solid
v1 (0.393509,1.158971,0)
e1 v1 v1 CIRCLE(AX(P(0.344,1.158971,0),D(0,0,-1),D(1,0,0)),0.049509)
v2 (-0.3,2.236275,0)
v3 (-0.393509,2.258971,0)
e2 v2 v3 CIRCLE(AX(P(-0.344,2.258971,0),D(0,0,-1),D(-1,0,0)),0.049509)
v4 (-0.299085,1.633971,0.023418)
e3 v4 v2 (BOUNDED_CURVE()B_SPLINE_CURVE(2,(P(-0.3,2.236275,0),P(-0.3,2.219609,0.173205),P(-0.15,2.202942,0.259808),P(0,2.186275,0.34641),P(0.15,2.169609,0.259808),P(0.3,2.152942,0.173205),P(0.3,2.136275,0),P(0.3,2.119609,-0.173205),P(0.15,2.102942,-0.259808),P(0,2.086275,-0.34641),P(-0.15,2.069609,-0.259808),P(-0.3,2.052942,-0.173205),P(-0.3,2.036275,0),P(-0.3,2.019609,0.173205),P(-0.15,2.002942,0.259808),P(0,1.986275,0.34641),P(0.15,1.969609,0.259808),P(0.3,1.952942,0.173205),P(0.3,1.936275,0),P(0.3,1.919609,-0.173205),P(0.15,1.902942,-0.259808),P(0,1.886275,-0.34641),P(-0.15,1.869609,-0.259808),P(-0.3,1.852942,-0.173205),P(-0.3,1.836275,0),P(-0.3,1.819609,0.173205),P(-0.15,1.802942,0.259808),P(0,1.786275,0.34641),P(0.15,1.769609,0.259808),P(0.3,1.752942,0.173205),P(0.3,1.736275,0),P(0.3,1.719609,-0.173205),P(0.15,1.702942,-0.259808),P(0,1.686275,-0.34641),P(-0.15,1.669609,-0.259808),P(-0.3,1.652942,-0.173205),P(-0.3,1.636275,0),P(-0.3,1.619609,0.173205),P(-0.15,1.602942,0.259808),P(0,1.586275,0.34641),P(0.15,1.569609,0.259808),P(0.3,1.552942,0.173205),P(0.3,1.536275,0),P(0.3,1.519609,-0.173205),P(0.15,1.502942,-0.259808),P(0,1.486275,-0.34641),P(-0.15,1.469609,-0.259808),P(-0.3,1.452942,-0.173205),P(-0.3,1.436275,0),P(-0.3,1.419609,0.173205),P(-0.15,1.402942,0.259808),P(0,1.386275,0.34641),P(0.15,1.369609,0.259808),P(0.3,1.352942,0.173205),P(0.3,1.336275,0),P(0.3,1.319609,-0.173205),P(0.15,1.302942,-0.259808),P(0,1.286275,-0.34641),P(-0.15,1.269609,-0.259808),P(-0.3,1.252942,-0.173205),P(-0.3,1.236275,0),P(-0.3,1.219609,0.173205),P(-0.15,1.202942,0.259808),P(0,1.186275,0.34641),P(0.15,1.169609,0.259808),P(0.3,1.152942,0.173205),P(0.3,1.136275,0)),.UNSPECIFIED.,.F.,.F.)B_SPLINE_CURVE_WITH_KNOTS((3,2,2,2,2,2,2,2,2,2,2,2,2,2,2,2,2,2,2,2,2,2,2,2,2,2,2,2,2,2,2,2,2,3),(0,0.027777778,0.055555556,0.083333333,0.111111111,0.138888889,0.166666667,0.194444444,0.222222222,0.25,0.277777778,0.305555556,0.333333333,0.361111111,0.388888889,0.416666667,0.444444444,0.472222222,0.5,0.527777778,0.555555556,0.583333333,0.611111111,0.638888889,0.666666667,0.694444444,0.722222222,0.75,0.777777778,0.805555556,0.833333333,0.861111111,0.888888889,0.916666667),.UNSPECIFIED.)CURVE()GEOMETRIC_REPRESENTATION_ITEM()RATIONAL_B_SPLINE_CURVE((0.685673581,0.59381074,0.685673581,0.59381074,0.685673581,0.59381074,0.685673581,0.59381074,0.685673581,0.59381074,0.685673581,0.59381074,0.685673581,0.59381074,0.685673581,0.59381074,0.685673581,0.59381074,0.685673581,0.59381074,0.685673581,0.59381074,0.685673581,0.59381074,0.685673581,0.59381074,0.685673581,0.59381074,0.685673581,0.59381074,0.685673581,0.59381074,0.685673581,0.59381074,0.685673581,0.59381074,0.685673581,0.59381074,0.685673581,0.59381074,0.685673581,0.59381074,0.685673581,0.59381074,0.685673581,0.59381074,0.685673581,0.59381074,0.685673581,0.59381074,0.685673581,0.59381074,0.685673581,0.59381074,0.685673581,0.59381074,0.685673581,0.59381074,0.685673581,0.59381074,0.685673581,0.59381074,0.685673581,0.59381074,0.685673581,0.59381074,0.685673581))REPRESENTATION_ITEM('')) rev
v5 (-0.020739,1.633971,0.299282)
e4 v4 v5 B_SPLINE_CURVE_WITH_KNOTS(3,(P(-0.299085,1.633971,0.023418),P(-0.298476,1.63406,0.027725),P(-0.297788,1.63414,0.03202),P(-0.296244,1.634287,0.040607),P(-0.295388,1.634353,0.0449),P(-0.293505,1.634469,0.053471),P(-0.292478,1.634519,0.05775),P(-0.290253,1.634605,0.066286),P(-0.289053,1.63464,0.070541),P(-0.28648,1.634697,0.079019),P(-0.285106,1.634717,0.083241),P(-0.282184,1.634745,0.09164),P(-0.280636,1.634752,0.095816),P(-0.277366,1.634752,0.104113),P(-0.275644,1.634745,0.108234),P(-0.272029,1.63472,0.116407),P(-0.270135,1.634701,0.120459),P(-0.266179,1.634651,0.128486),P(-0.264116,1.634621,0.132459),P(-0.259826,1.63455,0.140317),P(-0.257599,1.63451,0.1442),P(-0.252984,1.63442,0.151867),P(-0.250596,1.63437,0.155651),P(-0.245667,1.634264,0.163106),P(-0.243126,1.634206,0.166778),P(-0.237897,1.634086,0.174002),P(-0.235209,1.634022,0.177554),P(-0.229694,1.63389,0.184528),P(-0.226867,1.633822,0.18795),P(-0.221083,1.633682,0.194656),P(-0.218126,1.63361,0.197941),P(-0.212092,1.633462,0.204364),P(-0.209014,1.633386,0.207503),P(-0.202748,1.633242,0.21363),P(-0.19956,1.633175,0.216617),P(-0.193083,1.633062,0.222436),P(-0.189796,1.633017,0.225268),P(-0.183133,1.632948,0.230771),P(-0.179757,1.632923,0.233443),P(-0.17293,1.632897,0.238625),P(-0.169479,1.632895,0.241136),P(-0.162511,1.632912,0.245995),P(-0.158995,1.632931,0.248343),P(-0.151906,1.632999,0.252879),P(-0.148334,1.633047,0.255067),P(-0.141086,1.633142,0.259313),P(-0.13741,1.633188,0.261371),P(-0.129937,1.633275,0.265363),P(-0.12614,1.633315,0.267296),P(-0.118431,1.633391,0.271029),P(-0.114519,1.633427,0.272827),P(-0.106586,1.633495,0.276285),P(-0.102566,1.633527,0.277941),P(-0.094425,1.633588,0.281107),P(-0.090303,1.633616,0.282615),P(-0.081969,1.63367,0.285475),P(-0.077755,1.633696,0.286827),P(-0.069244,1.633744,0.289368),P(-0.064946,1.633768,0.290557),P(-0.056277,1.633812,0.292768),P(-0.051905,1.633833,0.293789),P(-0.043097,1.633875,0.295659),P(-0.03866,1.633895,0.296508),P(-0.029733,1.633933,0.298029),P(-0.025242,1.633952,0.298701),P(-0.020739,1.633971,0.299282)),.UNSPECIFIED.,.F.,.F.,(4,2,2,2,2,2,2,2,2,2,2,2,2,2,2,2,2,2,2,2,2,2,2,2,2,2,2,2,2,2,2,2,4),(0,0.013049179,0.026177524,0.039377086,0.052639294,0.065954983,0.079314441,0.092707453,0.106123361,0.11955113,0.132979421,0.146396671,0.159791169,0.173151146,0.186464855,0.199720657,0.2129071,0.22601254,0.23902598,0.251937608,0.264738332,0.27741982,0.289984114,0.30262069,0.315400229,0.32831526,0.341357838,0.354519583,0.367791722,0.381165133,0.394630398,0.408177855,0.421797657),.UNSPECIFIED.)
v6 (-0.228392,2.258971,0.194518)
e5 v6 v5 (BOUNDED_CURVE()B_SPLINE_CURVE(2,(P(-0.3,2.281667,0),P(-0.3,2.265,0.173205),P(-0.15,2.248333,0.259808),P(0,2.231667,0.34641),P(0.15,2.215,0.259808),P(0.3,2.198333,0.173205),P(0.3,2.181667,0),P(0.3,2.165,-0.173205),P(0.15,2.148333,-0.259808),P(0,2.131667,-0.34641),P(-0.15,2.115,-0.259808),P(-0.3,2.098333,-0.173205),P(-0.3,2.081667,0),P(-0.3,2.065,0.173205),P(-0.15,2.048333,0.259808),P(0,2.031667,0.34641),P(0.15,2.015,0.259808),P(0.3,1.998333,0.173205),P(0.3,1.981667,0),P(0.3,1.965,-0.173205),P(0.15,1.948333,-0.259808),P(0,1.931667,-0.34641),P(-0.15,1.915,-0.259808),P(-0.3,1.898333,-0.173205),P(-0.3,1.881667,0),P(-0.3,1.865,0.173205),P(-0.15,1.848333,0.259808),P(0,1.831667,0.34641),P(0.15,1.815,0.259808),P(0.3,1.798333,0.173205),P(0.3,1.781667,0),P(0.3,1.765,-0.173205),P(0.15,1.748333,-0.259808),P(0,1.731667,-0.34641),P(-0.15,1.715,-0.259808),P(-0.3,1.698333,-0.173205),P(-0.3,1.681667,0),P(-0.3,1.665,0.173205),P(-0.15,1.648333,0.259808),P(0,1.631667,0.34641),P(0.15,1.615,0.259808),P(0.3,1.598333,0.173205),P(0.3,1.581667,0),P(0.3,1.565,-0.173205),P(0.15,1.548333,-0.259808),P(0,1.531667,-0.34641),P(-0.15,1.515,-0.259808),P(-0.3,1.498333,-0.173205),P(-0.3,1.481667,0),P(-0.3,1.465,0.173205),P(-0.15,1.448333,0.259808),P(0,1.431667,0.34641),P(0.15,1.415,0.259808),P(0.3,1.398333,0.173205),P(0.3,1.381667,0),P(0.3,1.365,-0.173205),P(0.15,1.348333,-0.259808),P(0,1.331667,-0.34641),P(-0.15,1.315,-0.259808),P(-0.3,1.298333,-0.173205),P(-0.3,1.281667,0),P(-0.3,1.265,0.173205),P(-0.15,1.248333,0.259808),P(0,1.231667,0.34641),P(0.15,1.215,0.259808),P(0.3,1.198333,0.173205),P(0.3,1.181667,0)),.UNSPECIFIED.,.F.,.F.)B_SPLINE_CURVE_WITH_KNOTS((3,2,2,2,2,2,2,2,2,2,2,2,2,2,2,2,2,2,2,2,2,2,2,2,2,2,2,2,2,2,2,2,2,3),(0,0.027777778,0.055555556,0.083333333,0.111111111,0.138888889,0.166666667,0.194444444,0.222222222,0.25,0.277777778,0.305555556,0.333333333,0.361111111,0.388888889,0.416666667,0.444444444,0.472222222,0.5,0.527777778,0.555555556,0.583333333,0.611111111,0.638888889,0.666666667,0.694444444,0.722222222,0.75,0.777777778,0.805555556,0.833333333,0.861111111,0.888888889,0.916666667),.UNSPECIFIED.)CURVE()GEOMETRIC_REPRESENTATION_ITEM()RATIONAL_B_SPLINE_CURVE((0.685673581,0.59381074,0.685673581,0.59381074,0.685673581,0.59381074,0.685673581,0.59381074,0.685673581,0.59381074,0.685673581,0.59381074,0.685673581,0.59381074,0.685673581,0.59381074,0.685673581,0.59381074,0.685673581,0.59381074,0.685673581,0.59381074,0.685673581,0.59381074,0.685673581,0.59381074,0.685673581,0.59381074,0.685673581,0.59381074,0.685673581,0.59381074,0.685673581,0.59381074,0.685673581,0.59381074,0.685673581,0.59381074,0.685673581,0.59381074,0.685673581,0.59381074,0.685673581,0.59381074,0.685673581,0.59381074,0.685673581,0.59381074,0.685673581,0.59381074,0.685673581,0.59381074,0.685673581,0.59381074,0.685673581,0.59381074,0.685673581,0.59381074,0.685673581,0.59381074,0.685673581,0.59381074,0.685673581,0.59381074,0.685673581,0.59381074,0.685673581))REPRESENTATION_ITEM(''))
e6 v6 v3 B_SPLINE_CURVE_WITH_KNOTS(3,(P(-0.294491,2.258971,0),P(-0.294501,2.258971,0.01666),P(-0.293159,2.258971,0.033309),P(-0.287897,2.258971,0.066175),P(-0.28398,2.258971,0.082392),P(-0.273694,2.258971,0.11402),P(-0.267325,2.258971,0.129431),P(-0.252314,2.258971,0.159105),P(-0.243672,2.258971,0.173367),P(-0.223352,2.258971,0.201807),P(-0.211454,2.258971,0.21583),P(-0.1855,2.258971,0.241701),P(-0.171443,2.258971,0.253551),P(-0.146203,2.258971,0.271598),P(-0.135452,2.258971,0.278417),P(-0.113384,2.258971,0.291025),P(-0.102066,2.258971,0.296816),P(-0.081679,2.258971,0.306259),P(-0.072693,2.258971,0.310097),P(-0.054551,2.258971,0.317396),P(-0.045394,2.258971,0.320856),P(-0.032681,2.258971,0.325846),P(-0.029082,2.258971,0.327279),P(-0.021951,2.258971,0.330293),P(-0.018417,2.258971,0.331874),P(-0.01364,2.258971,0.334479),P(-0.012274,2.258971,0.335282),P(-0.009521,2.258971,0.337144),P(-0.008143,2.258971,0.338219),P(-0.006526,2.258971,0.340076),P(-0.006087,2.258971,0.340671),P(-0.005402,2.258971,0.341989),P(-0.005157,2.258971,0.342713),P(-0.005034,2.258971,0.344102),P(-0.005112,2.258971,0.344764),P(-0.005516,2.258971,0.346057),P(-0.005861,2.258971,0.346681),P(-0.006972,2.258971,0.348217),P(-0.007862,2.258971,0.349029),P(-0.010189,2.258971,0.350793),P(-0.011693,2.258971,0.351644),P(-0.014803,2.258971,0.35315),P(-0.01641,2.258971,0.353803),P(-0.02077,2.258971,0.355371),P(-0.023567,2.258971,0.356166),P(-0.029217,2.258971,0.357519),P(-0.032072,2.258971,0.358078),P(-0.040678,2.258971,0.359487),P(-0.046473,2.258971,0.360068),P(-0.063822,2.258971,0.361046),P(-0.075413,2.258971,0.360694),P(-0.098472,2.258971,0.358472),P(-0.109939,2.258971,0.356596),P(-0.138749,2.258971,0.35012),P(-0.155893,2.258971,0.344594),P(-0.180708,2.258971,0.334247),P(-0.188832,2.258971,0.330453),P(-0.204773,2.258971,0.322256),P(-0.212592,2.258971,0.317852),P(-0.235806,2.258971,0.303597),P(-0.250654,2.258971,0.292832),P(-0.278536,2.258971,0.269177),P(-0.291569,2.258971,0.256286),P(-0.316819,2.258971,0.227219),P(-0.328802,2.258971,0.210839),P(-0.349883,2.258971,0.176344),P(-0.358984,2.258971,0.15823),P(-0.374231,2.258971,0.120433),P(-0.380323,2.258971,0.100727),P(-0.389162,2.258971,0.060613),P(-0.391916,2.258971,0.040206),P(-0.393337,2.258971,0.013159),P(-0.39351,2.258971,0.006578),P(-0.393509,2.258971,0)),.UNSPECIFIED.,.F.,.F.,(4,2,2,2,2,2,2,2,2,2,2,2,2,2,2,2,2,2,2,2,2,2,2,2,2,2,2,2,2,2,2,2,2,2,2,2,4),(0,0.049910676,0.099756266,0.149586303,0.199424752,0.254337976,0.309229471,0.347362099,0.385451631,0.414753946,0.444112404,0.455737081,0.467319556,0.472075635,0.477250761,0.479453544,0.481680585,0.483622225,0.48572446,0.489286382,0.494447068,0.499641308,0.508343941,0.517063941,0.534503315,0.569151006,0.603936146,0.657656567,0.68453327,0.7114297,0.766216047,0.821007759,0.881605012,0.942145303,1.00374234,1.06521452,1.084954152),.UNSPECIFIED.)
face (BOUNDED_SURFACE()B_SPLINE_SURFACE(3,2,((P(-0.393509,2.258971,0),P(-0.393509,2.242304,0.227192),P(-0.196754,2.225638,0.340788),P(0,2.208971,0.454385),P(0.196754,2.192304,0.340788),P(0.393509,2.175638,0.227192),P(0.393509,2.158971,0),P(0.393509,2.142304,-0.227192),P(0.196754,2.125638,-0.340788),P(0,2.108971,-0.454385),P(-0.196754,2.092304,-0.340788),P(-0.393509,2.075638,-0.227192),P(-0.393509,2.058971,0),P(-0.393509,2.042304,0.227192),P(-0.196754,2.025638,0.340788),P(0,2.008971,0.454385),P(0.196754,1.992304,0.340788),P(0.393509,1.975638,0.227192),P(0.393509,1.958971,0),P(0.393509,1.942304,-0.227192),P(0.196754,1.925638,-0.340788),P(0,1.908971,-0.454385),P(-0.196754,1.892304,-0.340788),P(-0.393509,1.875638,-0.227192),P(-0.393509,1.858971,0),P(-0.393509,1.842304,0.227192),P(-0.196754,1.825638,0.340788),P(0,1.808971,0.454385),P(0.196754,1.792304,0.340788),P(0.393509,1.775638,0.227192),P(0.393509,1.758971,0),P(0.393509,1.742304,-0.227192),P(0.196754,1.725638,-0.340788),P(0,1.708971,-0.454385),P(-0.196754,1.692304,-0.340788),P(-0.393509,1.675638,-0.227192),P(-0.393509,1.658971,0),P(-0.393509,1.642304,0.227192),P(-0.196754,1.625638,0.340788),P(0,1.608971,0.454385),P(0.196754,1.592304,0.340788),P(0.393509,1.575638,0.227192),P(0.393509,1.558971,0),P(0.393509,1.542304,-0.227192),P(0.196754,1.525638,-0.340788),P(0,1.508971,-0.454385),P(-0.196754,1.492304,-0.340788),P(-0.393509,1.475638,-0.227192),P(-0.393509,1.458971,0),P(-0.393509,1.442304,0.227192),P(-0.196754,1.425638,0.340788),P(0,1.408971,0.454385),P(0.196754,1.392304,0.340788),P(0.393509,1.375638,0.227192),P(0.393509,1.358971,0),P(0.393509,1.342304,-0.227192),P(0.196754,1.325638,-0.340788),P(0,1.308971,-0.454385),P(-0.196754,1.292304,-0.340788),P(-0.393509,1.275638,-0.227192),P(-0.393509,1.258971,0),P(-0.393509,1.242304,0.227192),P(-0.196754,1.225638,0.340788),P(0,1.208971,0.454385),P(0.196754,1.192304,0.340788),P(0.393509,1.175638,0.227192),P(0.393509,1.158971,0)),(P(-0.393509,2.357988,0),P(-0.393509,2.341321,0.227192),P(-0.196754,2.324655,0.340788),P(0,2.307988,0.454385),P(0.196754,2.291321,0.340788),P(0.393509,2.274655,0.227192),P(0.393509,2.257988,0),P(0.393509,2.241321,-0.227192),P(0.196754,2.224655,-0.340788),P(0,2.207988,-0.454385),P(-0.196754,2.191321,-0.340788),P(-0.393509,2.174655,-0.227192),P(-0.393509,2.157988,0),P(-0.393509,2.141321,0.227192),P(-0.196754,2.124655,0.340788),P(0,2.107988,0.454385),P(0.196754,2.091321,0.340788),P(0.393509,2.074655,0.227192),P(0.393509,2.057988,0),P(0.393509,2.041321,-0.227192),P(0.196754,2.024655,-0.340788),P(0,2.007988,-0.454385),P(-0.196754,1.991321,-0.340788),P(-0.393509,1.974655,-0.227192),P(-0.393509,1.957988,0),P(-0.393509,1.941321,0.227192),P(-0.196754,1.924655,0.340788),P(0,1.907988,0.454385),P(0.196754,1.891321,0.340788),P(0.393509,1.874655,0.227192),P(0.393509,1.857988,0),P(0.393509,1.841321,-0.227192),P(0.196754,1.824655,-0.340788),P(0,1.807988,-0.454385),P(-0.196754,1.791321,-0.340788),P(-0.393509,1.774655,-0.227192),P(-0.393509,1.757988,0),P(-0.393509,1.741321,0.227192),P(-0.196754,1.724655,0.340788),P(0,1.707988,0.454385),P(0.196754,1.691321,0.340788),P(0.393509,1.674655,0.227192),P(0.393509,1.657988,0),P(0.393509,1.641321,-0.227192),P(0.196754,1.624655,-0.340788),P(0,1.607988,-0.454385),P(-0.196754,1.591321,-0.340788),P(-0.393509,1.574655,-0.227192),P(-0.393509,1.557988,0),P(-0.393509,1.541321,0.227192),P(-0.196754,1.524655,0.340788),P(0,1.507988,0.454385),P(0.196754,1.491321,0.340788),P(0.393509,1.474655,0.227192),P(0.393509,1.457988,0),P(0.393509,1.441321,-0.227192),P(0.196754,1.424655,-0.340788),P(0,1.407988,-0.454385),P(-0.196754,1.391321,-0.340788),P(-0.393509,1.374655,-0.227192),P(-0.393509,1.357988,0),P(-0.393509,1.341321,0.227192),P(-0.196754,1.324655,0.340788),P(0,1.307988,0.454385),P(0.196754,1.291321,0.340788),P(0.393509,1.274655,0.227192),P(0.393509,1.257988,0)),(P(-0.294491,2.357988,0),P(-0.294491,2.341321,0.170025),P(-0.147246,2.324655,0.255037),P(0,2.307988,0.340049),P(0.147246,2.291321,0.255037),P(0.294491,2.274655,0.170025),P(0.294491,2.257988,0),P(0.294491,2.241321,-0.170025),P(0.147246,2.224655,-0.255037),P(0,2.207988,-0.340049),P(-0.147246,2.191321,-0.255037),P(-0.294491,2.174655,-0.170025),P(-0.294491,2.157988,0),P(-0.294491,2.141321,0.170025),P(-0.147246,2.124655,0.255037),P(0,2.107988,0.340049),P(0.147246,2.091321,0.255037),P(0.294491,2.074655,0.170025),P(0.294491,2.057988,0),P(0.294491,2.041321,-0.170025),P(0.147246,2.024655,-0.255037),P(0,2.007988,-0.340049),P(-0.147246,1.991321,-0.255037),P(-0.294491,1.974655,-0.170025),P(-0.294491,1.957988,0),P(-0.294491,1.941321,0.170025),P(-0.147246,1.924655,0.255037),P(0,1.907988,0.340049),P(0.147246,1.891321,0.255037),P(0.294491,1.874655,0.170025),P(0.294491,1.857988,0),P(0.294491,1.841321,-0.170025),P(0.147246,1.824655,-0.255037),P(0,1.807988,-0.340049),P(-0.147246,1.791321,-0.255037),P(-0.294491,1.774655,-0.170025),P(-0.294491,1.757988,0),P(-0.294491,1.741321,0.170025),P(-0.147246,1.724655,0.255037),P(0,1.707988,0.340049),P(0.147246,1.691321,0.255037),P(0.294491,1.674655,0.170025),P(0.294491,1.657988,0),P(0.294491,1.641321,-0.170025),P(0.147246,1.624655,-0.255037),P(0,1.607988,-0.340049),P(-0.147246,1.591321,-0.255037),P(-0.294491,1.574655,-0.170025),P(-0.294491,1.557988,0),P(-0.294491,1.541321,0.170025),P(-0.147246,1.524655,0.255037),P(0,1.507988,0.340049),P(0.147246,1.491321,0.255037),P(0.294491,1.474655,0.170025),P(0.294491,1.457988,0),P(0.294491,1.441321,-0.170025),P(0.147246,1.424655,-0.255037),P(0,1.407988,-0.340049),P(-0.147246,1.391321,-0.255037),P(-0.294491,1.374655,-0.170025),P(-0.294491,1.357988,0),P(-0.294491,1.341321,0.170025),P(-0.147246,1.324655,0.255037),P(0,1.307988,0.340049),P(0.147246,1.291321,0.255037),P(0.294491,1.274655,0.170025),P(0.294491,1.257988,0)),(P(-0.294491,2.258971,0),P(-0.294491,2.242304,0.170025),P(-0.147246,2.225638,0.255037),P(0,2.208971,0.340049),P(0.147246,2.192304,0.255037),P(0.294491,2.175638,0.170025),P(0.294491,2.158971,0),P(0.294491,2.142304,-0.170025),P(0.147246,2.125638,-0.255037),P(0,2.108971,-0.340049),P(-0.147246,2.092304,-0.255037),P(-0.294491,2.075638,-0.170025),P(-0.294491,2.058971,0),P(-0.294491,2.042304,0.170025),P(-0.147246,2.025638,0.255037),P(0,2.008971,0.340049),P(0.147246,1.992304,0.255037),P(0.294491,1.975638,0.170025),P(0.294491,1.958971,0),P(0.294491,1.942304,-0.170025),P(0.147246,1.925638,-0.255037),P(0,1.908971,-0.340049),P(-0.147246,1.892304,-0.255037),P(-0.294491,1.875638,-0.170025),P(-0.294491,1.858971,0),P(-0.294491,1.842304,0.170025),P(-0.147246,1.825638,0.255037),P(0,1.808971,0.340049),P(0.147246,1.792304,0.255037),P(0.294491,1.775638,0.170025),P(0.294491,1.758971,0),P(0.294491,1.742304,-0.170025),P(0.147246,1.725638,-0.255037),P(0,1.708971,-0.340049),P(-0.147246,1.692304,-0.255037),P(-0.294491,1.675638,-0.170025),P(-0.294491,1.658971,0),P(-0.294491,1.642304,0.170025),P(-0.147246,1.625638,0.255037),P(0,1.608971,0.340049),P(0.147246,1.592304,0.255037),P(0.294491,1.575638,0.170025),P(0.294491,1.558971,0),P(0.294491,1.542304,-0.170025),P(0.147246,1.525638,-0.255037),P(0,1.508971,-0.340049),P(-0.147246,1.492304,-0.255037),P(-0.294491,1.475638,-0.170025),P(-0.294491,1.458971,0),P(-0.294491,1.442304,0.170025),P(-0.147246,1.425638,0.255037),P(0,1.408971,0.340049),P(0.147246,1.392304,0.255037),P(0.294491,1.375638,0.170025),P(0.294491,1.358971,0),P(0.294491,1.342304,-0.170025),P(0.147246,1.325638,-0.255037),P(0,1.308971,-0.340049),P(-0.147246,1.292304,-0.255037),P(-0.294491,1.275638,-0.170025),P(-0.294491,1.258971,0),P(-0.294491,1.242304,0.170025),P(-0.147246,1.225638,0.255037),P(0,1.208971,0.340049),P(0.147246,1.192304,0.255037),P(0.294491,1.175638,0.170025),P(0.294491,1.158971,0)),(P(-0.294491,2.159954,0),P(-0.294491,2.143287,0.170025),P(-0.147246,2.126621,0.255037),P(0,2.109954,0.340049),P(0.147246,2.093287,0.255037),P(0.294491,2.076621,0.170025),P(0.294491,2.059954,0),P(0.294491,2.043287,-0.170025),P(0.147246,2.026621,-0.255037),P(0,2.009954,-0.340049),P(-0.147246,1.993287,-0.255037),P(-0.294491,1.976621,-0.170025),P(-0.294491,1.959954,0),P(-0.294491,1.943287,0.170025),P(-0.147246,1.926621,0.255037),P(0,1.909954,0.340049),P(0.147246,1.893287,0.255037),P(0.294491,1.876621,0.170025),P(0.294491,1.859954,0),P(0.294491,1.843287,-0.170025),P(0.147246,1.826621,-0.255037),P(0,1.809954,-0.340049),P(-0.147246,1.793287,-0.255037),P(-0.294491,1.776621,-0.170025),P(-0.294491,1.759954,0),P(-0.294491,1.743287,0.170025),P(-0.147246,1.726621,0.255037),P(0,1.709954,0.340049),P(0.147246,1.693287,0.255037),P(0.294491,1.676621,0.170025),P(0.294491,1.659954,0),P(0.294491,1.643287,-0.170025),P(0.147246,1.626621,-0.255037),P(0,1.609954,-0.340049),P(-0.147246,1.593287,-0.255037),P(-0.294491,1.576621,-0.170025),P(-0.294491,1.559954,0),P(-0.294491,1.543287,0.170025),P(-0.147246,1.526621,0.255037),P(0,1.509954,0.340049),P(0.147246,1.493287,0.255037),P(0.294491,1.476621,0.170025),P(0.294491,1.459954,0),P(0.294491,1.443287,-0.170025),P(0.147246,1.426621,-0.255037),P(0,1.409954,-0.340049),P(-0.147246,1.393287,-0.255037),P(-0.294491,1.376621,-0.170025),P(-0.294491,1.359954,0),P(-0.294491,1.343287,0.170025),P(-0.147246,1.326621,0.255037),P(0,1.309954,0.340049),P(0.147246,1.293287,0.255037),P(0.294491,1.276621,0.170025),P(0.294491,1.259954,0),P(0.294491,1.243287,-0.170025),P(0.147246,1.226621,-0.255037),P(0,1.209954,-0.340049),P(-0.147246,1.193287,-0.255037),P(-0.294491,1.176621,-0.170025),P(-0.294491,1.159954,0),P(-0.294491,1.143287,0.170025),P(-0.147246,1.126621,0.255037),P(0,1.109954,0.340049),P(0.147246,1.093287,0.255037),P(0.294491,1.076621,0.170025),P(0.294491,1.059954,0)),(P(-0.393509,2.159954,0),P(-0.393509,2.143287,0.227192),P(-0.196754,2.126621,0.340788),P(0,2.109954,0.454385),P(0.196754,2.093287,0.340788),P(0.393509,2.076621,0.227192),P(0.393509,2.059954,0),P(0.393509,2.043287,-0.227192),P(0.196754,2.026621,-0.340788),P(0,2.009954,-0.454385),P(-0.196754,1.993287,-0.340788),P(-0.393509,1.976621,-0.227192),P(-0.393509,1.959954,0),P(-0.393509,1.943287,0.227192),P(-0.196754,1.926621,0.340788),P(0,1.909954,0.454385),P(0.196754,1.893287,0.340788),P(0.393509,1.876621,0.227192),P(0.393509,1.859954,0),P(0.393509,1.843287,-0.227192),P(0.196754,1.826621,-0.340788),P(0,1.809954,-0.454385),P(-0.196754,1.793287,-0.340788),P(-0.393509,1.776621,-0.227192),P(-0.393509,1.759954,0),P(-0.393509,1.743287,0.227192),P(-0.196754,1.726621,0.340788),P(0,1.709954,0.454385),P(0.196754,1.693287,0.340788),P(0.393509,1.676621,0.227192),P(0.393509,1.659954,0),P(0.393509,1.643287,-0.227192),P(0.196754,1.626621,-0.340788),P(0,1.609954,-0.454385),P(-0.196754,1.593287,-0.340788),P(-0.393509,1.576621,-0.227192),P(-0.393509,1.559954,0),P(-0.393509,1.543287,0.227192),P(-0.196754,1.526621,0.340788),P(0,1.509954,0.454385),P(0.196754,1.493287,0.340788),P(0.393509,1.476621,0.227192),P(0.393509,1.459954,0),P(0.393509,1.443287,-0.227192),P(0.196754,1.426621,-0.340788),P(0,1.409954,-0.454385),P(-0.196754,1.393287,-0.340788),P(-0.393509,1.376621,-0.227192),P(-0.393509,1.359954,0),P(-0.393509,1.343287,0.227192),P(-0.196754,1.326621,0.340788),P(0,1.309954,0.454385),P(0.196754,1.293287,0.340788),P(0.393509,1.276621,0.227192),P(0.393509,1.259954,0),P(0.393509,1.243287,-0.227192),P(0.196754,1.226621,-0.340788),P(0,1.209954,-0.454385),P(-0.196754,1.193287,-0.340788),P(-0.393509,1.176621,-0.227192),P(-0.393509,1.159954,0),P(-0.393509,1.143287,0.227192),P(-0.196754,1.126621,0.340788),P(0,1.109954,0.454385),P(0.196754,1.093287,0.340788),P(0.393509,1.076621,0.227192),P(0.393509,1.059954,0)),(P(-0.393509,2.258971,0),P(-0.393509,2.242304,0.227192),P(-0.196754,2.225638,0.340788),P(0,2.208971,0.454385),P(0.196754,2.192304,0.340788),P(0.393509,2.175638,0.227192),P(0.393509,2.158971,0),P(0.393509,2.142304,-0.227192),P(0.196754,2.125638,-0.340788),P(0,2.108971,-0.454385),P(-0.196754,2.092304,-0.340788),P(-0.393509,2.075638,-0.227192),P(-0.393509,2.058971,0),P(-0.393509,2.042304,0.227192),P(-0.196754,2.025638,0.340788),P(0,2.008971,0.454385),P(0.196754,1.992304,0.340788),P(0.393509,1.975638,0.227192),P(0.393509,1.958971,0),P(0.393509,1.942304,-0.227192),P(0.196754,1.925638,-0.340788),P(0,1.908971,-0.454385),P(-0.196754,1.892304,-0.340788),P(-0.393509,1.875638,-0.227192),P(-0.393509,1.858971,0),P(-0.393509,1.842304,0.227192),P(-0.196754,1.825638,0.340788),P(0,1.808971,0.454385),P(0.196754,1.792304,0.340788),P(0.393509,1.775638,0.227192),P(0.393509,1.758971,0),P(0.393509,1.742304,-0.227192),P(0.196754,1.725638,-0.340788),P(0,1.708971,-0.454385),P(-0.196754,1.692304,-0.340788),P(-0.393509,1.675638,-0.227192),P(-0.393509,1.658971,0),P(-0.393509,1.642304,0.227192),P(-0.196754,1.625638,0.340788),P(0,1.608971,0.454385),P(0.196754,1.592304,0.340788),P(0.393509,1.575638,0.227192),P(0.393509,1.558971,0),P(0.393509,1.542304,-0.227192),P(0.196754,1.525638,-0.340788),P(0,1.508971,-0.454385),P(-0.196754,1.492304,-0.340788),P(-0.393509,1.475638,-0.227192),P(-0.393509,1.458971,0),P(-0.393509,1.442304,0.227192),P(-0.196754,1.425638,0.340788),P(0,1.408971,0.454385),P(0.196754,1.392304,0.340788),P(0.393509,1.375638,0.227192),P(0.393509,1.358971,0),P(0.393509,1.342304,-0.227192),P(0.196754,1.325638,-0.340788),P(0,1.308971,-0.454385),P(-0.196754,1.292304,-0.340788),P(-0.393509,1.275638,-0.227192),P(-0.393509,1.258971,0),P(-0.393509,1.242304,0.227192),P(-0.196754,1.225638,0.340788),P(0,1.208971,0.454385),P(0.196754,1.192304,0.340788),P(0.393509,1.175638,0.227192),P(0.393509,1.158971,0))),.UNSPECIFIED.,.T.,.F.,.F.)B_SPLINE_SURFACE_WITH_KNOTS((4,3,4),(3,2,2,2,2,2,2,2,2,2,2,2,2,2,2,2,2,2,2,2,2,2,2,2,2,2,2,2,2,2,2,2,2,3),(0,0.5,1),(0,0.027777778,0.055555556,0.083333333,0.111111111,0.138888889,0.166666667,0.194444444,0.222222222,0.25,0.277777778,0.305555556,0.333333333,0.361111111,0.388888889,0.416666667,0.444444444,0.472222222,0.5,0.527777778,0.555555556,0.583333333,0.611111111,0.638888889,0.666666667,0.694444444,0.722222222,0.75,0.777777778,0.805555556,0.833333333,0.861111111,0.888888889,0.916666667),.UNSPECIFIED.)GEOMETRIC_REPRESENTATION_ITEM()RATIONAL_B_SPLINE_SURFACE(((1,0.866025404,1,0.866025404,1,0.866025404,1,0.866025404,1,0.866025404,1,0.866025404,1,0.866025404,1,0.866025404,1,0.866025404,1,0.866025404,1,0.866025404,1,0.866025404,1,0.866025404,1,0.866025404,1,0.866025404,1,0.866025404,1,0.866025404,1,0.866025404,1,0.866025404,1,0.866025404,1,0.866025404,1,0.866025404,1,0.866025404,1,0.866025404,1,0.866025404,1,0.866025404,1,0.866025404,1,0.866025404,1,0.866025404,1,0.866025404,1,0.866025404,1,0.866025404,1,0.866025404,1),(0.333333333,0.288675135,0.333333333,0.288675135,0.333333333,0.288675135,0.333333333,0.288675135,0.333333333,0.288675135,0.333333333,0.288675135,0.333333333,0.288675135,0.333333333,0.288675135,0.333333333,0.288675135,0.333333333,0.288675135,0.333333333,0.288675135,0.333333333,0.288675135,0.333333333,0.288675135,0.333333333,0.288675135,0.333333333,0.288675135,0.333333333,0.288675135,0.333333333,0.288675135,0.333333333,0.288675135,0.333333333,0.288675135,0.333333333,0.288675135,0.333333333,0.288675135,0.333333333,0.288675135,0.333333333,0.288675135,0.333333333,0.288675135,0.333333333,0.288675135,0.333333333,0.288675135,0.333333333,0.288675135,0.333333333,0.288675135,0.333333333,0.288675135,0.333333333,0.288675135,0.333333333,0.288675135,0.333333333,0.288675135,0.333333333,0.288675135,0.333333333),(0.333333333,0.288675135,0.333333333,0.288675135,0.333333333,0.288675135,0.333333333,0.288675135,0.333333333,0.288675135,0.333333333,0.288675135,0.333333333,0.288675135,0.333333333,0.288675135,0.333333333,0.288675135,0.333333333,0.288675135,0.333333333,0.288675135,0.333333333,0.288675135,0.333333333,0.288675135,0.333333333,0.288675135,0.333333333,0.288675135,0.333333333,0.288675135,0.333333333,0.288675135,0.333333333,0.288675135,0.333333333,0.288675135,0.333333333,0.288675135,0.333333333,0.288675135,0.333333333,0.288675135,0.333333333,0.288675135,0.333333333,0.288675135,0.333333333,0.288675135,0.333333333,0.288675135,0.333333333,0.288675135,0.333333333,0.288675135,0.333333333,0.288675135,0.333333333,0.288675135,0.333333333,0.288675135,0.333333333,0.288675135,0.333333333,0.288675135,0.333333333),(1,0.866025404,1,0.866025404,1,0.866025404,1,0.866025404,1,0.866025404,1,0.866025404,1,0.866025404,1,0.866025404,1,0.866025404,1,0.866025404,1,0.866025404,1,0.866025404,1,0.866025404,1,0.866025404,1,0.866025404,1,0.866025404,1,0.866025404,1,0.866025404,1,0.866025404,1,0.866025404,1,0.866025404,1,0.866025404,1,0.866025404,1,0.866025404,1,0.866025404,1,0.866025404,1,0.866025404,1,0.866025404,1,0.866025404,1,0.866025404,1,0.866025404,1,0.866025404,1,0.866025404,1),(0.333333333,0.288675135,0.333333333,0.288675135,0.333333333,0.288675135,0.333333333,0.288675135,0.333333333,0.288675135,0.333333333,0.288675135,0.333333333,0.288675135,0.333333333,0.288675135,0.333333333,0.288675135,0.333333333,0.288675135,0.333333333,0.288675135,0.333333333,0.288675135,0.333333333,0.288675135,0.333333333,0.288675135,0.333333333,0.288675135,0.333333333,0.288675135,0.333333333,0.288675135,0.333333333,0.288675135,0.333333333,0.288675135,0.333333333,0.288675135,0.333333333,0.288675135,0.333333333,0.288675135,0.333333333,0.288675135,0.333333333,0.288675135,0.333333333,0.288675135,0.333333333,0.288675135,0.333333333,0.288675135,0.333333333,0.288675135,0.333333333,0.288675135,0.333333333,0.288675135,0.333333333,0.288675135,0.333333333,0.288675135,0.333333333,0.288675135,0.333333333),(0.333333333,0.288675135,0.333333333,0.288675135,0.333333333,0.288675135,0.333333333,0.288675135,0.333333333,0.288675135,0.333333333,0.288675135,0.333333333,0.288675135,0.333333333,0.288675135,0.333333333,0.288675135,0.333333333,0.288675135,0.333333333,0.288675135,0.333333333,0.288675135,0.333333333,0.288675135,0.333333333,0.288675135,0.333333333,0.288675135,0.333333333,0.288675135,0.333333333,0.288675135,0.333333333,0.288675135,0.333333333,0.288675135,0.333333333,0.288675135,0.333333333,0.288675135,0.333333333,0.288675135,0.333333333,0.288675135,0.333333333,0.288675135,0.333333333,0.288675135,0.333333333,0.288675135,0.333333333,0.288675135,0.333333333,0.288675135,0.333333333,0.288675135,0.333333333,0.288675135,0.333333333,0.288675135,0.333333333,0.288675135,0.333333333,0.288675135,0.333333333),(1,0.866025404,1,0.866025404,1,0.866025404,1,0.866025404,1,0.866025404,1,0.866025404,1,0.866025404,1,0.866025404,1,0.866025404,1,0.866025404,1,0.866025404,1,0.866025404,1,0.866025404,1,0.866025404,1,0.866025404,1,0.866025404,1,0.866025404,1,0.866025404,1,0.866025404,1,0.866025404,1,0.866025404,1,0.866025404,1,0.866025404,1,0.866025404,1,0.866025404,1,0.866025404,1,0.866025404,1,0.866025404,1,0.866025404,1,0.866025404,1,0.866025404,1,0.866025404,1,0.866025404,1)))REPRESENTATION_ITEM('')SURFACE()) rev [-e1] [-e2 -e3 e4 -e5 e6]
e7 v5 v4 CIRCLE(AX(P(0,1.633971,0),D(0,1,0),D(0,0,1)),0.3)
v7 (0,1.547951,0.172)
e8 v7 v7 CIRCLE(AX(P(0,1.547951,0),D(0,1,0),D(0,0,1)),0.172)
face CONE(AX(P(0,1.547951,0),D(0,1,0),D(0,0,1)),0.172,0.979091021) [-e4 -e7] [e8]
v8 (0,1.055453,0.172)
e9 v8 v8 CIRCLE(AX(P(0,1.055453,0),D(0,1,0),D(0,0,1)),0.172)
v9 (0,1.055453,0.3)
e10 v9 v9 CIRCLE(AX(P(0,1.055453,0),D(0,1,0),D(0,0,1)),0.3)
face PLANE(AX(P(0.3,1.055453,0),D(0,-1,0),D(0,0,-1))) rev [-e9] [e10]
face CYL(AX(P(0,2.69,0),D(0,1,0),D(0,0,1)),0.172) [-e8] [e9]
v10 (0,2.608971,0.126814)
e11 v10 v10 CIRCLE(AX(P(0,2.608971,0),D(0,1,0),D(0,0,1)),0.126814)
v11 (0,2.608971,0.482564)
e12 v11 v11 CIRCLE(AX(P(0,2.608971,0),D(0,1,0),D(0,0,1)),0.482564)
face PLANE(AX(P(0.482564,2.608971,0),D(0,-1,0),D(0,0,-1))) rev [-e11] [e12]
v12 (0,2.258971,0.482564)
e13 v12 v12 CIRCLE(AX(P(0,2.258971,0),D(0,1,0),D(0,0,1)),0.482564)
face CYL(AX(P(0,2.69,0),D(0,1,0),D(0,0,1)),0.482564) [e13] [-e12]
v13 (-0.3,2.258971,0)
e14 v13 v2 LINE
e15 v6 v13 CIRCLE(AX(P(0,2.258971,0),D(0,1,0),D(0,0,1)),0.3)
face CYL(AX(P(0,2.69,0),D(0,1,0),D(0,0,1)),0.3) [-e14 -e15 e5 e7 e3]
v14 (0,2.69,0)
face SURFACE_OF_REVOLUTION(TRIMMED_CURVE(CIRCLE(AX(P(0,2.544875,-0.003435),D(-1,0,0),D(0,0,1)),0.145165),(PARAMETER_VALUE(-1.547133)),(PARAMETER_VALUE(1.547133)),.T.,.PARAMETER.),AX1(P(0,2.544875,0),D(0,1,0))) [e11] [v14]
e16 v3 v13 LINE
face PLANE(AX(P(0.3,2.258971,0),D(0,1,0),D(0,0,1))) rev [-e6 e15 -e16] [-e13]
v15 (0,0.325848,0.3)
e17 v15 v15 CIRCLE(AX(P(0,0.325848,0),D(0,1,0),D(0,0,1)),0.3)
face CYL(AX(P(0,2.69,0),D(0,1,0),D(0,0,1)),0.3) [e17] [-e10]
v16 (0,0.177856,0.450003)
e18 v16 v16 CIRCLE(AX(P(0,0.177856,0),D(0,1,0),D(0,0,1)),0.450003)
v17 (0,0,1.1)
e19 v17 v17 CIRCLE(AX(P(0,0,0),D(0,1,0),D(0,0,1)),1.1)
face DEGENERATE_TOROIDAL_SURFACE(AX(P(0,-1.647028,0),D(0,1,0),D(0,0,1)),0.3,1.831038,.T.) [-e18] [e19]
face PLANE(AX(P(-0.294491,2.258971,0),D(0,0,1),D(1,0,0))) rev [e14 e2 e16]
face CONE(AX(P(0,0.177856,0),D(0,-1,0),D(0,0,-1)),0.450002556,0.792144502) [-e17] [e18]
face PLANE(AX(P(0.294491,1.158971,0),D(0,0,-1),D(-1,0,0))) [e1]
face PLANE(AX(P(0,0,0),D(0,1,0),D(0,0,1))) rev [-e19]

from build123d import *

# Parameters (mm, degrees)
SWEEP1_PITCH = 0.2


with BuildPart() as part:
    # Sketch2 → Revolve1 (revolve)
    with BuildSketch(Plane.XY, mode=Mode.PRIVATE) as revolve1_sk:
        with BuildLine():
            Line((0, 2.69), (0, 0))
            Line((0, 0), (1.1, 0))
            ThreePointArc((1.1, 0), (0.783253944, 0.119088317), (0.450002556, 0.17785568))
            Line((0.450002556, 0.17785568), (0.3, 0.325847832))
            Line((0.3, 0.325847832), (0.3, 1.055453223))
            Line((0.3, 1.055453223), (0.172, 1.055453223))
            Line((0.172, 1.055453223), (0.172, 1.547951305))
            Line((0.172, 1.547951305), (0.3, 1.633970924))
            Line((0.3, 1.633970924), (0.3, 2.258970924))
            Line((0.3, 2.258970924), (0.482563584, 2.258970924))
            Line((0.482563584, 2.258970924), (0.482563584, 2.608970924))
            Line((0.482563584, 2.608970924), (0.126814035, 2.608970924))
            ThreePointArc((0.126814035, 2.608970924), (0.074726944, 2.66720164), (0, 2.69))
        make_face()
    revolve(revolve1_sk.sketch.rotate(Axis((0, 2.69, 0), (0, -1, 0)), 90), axis=Axis((0, 2.69, 0), (0, -1, 0)))

    # Sweep1: arcs per turn and ends read off the stored shape
    # Sweep1: the profile of Sketch4 screwed along a left-hand helix through 5.5 turns, 6 arcs to a turn; built about Z, then put on its axis
    sweep1_z = Axis((0, 0, 0), (0, 0, 1))
    sweep1_corners = [(0.393508531, 0, 0), (0.344, 0, -0.049508531), (0.294491469, 0, 0), (0.344, 0, 0.049508531)]
    with BuildLine(mode=Mode.PRIVATE) as sweep1_profile:
        ThreePointArc((0.393508531, 0, 0), (0.379007818, 0, -0.035007818), (0.344, 0, -0.049508531))
        ThreePointArc((0.344, 0, -0.049508531), (0.308992182, 0, -0.035007818), (0.294491469, 0, 0))
        ThreePointArc((0.294491469, 0, 0), (0.308992182, 0, 0.035007818), (0.344, 0, 0.049508531))
        ThreePointArc((0.344, 0, 0.049508531), (0.379007818, 0, 0.035007818), (0.393508531, 0, 0))
    sweep1_cap = Face(sweep1_profile.wire())
    sweep1_arcs = [((0.393508531, 0, 0), (0.393508531, 0, -0.049508531), (0.344, 0, -0.049508531), (1, 0.7071067811865476, 1)), ((0.344, 0, -0.049508531), (0.294491469, 0, -0.049508531), (0.294491469, 0, 0), (1, 0.7071067811865476, 1)), ((0.294491469, 0, 0), (0.294491469, 0, 0.049508531), (0.344, 0, 0.049508531), (1, 0.7071067811865476, 1)), ((0.344, 0, 0.049508531), (0.393508531, 0, 0.049508531), (0.393508531, 0, 0), (1, 0.7071067811865476, 1))]  # start, shoulder, end, weights
    sweep1_turn_angles = [0, -30, -60, -90, -120, -150, -180, -210, -240, -270, -300, -330, -360]
    sweep1_turn_weights = [1, 0.8660254037844387, 1, 0.8660254037844387, 1, 0.8660254037844387, 1, 0.8660254037844387, 1, 0.8660254037844387, 1, 0.8660254037844387, 1]
    sweep1_turn_sides = [Face.make_bezier_surface([[Vector(p[j][0], p[j][1], 0).rotate(sweep1_z, sweep1_turn_angles[2 * i + k]) / sweep1_turn_weights[2 * i + k] + Vector(0, 0, p[j][2] + -SWEEP1_PITCH * sweep1_turn_angles[2 * i + k] / 360) for k in range(3)] for j in range(3)], [[p[3][j] * sweep1_turn_weights[2 * i + k] for k in range(3)] for j in range(3)]) for p in sweep1_arcs for i in range(6)]
    sweep1_last_angles = [-1800, -1830, -1860, -1890, -1920, -1950, -1980]
    sweep1_last_weights = [1, 0.8660254037844387, 1, 0.8660254037844387, 1, 0.8660254037844178, 1]
    sweep1_last_sides = [Face.make_bezier_surface([[Vector(p[j][0], p[j][1], 0).rotate(sweep1_z, sweep1_last_angles[2 * i + k]) / sweep1_last_weights[2 * i + k] + Vector(0, 0, p[j][2] + -SWEEP1_PITCH * sweep1_last_angles[2 * i + k] / 360) for k in range(3)] for j in range(3)], [[p[3][j] * sweep1_last_weights[2 * i + k] for k in range(3)] for j in range(3)]) for p in sweep1_arcs for i in range(3)]
    sweep1 = Plane(origin=(0, 2.258970924, 0), x_dir=(-1, 0, 0), z_dir=(0, -1, 0)) * Solid(Shell([*[p.moved(Location((0, 0, SWEEP1_PITCH * i))) for i in range(5) for p in sweep1_turn_sides], *sweep1_last_sides, sweep1_cap, sweep1_cap.rotate(sweep1_z, -1980).moved(Location((0, 0, -SWEEP1_PITCH * -1980 / 360)))]))
    add(sweep1)


solid = part.part
